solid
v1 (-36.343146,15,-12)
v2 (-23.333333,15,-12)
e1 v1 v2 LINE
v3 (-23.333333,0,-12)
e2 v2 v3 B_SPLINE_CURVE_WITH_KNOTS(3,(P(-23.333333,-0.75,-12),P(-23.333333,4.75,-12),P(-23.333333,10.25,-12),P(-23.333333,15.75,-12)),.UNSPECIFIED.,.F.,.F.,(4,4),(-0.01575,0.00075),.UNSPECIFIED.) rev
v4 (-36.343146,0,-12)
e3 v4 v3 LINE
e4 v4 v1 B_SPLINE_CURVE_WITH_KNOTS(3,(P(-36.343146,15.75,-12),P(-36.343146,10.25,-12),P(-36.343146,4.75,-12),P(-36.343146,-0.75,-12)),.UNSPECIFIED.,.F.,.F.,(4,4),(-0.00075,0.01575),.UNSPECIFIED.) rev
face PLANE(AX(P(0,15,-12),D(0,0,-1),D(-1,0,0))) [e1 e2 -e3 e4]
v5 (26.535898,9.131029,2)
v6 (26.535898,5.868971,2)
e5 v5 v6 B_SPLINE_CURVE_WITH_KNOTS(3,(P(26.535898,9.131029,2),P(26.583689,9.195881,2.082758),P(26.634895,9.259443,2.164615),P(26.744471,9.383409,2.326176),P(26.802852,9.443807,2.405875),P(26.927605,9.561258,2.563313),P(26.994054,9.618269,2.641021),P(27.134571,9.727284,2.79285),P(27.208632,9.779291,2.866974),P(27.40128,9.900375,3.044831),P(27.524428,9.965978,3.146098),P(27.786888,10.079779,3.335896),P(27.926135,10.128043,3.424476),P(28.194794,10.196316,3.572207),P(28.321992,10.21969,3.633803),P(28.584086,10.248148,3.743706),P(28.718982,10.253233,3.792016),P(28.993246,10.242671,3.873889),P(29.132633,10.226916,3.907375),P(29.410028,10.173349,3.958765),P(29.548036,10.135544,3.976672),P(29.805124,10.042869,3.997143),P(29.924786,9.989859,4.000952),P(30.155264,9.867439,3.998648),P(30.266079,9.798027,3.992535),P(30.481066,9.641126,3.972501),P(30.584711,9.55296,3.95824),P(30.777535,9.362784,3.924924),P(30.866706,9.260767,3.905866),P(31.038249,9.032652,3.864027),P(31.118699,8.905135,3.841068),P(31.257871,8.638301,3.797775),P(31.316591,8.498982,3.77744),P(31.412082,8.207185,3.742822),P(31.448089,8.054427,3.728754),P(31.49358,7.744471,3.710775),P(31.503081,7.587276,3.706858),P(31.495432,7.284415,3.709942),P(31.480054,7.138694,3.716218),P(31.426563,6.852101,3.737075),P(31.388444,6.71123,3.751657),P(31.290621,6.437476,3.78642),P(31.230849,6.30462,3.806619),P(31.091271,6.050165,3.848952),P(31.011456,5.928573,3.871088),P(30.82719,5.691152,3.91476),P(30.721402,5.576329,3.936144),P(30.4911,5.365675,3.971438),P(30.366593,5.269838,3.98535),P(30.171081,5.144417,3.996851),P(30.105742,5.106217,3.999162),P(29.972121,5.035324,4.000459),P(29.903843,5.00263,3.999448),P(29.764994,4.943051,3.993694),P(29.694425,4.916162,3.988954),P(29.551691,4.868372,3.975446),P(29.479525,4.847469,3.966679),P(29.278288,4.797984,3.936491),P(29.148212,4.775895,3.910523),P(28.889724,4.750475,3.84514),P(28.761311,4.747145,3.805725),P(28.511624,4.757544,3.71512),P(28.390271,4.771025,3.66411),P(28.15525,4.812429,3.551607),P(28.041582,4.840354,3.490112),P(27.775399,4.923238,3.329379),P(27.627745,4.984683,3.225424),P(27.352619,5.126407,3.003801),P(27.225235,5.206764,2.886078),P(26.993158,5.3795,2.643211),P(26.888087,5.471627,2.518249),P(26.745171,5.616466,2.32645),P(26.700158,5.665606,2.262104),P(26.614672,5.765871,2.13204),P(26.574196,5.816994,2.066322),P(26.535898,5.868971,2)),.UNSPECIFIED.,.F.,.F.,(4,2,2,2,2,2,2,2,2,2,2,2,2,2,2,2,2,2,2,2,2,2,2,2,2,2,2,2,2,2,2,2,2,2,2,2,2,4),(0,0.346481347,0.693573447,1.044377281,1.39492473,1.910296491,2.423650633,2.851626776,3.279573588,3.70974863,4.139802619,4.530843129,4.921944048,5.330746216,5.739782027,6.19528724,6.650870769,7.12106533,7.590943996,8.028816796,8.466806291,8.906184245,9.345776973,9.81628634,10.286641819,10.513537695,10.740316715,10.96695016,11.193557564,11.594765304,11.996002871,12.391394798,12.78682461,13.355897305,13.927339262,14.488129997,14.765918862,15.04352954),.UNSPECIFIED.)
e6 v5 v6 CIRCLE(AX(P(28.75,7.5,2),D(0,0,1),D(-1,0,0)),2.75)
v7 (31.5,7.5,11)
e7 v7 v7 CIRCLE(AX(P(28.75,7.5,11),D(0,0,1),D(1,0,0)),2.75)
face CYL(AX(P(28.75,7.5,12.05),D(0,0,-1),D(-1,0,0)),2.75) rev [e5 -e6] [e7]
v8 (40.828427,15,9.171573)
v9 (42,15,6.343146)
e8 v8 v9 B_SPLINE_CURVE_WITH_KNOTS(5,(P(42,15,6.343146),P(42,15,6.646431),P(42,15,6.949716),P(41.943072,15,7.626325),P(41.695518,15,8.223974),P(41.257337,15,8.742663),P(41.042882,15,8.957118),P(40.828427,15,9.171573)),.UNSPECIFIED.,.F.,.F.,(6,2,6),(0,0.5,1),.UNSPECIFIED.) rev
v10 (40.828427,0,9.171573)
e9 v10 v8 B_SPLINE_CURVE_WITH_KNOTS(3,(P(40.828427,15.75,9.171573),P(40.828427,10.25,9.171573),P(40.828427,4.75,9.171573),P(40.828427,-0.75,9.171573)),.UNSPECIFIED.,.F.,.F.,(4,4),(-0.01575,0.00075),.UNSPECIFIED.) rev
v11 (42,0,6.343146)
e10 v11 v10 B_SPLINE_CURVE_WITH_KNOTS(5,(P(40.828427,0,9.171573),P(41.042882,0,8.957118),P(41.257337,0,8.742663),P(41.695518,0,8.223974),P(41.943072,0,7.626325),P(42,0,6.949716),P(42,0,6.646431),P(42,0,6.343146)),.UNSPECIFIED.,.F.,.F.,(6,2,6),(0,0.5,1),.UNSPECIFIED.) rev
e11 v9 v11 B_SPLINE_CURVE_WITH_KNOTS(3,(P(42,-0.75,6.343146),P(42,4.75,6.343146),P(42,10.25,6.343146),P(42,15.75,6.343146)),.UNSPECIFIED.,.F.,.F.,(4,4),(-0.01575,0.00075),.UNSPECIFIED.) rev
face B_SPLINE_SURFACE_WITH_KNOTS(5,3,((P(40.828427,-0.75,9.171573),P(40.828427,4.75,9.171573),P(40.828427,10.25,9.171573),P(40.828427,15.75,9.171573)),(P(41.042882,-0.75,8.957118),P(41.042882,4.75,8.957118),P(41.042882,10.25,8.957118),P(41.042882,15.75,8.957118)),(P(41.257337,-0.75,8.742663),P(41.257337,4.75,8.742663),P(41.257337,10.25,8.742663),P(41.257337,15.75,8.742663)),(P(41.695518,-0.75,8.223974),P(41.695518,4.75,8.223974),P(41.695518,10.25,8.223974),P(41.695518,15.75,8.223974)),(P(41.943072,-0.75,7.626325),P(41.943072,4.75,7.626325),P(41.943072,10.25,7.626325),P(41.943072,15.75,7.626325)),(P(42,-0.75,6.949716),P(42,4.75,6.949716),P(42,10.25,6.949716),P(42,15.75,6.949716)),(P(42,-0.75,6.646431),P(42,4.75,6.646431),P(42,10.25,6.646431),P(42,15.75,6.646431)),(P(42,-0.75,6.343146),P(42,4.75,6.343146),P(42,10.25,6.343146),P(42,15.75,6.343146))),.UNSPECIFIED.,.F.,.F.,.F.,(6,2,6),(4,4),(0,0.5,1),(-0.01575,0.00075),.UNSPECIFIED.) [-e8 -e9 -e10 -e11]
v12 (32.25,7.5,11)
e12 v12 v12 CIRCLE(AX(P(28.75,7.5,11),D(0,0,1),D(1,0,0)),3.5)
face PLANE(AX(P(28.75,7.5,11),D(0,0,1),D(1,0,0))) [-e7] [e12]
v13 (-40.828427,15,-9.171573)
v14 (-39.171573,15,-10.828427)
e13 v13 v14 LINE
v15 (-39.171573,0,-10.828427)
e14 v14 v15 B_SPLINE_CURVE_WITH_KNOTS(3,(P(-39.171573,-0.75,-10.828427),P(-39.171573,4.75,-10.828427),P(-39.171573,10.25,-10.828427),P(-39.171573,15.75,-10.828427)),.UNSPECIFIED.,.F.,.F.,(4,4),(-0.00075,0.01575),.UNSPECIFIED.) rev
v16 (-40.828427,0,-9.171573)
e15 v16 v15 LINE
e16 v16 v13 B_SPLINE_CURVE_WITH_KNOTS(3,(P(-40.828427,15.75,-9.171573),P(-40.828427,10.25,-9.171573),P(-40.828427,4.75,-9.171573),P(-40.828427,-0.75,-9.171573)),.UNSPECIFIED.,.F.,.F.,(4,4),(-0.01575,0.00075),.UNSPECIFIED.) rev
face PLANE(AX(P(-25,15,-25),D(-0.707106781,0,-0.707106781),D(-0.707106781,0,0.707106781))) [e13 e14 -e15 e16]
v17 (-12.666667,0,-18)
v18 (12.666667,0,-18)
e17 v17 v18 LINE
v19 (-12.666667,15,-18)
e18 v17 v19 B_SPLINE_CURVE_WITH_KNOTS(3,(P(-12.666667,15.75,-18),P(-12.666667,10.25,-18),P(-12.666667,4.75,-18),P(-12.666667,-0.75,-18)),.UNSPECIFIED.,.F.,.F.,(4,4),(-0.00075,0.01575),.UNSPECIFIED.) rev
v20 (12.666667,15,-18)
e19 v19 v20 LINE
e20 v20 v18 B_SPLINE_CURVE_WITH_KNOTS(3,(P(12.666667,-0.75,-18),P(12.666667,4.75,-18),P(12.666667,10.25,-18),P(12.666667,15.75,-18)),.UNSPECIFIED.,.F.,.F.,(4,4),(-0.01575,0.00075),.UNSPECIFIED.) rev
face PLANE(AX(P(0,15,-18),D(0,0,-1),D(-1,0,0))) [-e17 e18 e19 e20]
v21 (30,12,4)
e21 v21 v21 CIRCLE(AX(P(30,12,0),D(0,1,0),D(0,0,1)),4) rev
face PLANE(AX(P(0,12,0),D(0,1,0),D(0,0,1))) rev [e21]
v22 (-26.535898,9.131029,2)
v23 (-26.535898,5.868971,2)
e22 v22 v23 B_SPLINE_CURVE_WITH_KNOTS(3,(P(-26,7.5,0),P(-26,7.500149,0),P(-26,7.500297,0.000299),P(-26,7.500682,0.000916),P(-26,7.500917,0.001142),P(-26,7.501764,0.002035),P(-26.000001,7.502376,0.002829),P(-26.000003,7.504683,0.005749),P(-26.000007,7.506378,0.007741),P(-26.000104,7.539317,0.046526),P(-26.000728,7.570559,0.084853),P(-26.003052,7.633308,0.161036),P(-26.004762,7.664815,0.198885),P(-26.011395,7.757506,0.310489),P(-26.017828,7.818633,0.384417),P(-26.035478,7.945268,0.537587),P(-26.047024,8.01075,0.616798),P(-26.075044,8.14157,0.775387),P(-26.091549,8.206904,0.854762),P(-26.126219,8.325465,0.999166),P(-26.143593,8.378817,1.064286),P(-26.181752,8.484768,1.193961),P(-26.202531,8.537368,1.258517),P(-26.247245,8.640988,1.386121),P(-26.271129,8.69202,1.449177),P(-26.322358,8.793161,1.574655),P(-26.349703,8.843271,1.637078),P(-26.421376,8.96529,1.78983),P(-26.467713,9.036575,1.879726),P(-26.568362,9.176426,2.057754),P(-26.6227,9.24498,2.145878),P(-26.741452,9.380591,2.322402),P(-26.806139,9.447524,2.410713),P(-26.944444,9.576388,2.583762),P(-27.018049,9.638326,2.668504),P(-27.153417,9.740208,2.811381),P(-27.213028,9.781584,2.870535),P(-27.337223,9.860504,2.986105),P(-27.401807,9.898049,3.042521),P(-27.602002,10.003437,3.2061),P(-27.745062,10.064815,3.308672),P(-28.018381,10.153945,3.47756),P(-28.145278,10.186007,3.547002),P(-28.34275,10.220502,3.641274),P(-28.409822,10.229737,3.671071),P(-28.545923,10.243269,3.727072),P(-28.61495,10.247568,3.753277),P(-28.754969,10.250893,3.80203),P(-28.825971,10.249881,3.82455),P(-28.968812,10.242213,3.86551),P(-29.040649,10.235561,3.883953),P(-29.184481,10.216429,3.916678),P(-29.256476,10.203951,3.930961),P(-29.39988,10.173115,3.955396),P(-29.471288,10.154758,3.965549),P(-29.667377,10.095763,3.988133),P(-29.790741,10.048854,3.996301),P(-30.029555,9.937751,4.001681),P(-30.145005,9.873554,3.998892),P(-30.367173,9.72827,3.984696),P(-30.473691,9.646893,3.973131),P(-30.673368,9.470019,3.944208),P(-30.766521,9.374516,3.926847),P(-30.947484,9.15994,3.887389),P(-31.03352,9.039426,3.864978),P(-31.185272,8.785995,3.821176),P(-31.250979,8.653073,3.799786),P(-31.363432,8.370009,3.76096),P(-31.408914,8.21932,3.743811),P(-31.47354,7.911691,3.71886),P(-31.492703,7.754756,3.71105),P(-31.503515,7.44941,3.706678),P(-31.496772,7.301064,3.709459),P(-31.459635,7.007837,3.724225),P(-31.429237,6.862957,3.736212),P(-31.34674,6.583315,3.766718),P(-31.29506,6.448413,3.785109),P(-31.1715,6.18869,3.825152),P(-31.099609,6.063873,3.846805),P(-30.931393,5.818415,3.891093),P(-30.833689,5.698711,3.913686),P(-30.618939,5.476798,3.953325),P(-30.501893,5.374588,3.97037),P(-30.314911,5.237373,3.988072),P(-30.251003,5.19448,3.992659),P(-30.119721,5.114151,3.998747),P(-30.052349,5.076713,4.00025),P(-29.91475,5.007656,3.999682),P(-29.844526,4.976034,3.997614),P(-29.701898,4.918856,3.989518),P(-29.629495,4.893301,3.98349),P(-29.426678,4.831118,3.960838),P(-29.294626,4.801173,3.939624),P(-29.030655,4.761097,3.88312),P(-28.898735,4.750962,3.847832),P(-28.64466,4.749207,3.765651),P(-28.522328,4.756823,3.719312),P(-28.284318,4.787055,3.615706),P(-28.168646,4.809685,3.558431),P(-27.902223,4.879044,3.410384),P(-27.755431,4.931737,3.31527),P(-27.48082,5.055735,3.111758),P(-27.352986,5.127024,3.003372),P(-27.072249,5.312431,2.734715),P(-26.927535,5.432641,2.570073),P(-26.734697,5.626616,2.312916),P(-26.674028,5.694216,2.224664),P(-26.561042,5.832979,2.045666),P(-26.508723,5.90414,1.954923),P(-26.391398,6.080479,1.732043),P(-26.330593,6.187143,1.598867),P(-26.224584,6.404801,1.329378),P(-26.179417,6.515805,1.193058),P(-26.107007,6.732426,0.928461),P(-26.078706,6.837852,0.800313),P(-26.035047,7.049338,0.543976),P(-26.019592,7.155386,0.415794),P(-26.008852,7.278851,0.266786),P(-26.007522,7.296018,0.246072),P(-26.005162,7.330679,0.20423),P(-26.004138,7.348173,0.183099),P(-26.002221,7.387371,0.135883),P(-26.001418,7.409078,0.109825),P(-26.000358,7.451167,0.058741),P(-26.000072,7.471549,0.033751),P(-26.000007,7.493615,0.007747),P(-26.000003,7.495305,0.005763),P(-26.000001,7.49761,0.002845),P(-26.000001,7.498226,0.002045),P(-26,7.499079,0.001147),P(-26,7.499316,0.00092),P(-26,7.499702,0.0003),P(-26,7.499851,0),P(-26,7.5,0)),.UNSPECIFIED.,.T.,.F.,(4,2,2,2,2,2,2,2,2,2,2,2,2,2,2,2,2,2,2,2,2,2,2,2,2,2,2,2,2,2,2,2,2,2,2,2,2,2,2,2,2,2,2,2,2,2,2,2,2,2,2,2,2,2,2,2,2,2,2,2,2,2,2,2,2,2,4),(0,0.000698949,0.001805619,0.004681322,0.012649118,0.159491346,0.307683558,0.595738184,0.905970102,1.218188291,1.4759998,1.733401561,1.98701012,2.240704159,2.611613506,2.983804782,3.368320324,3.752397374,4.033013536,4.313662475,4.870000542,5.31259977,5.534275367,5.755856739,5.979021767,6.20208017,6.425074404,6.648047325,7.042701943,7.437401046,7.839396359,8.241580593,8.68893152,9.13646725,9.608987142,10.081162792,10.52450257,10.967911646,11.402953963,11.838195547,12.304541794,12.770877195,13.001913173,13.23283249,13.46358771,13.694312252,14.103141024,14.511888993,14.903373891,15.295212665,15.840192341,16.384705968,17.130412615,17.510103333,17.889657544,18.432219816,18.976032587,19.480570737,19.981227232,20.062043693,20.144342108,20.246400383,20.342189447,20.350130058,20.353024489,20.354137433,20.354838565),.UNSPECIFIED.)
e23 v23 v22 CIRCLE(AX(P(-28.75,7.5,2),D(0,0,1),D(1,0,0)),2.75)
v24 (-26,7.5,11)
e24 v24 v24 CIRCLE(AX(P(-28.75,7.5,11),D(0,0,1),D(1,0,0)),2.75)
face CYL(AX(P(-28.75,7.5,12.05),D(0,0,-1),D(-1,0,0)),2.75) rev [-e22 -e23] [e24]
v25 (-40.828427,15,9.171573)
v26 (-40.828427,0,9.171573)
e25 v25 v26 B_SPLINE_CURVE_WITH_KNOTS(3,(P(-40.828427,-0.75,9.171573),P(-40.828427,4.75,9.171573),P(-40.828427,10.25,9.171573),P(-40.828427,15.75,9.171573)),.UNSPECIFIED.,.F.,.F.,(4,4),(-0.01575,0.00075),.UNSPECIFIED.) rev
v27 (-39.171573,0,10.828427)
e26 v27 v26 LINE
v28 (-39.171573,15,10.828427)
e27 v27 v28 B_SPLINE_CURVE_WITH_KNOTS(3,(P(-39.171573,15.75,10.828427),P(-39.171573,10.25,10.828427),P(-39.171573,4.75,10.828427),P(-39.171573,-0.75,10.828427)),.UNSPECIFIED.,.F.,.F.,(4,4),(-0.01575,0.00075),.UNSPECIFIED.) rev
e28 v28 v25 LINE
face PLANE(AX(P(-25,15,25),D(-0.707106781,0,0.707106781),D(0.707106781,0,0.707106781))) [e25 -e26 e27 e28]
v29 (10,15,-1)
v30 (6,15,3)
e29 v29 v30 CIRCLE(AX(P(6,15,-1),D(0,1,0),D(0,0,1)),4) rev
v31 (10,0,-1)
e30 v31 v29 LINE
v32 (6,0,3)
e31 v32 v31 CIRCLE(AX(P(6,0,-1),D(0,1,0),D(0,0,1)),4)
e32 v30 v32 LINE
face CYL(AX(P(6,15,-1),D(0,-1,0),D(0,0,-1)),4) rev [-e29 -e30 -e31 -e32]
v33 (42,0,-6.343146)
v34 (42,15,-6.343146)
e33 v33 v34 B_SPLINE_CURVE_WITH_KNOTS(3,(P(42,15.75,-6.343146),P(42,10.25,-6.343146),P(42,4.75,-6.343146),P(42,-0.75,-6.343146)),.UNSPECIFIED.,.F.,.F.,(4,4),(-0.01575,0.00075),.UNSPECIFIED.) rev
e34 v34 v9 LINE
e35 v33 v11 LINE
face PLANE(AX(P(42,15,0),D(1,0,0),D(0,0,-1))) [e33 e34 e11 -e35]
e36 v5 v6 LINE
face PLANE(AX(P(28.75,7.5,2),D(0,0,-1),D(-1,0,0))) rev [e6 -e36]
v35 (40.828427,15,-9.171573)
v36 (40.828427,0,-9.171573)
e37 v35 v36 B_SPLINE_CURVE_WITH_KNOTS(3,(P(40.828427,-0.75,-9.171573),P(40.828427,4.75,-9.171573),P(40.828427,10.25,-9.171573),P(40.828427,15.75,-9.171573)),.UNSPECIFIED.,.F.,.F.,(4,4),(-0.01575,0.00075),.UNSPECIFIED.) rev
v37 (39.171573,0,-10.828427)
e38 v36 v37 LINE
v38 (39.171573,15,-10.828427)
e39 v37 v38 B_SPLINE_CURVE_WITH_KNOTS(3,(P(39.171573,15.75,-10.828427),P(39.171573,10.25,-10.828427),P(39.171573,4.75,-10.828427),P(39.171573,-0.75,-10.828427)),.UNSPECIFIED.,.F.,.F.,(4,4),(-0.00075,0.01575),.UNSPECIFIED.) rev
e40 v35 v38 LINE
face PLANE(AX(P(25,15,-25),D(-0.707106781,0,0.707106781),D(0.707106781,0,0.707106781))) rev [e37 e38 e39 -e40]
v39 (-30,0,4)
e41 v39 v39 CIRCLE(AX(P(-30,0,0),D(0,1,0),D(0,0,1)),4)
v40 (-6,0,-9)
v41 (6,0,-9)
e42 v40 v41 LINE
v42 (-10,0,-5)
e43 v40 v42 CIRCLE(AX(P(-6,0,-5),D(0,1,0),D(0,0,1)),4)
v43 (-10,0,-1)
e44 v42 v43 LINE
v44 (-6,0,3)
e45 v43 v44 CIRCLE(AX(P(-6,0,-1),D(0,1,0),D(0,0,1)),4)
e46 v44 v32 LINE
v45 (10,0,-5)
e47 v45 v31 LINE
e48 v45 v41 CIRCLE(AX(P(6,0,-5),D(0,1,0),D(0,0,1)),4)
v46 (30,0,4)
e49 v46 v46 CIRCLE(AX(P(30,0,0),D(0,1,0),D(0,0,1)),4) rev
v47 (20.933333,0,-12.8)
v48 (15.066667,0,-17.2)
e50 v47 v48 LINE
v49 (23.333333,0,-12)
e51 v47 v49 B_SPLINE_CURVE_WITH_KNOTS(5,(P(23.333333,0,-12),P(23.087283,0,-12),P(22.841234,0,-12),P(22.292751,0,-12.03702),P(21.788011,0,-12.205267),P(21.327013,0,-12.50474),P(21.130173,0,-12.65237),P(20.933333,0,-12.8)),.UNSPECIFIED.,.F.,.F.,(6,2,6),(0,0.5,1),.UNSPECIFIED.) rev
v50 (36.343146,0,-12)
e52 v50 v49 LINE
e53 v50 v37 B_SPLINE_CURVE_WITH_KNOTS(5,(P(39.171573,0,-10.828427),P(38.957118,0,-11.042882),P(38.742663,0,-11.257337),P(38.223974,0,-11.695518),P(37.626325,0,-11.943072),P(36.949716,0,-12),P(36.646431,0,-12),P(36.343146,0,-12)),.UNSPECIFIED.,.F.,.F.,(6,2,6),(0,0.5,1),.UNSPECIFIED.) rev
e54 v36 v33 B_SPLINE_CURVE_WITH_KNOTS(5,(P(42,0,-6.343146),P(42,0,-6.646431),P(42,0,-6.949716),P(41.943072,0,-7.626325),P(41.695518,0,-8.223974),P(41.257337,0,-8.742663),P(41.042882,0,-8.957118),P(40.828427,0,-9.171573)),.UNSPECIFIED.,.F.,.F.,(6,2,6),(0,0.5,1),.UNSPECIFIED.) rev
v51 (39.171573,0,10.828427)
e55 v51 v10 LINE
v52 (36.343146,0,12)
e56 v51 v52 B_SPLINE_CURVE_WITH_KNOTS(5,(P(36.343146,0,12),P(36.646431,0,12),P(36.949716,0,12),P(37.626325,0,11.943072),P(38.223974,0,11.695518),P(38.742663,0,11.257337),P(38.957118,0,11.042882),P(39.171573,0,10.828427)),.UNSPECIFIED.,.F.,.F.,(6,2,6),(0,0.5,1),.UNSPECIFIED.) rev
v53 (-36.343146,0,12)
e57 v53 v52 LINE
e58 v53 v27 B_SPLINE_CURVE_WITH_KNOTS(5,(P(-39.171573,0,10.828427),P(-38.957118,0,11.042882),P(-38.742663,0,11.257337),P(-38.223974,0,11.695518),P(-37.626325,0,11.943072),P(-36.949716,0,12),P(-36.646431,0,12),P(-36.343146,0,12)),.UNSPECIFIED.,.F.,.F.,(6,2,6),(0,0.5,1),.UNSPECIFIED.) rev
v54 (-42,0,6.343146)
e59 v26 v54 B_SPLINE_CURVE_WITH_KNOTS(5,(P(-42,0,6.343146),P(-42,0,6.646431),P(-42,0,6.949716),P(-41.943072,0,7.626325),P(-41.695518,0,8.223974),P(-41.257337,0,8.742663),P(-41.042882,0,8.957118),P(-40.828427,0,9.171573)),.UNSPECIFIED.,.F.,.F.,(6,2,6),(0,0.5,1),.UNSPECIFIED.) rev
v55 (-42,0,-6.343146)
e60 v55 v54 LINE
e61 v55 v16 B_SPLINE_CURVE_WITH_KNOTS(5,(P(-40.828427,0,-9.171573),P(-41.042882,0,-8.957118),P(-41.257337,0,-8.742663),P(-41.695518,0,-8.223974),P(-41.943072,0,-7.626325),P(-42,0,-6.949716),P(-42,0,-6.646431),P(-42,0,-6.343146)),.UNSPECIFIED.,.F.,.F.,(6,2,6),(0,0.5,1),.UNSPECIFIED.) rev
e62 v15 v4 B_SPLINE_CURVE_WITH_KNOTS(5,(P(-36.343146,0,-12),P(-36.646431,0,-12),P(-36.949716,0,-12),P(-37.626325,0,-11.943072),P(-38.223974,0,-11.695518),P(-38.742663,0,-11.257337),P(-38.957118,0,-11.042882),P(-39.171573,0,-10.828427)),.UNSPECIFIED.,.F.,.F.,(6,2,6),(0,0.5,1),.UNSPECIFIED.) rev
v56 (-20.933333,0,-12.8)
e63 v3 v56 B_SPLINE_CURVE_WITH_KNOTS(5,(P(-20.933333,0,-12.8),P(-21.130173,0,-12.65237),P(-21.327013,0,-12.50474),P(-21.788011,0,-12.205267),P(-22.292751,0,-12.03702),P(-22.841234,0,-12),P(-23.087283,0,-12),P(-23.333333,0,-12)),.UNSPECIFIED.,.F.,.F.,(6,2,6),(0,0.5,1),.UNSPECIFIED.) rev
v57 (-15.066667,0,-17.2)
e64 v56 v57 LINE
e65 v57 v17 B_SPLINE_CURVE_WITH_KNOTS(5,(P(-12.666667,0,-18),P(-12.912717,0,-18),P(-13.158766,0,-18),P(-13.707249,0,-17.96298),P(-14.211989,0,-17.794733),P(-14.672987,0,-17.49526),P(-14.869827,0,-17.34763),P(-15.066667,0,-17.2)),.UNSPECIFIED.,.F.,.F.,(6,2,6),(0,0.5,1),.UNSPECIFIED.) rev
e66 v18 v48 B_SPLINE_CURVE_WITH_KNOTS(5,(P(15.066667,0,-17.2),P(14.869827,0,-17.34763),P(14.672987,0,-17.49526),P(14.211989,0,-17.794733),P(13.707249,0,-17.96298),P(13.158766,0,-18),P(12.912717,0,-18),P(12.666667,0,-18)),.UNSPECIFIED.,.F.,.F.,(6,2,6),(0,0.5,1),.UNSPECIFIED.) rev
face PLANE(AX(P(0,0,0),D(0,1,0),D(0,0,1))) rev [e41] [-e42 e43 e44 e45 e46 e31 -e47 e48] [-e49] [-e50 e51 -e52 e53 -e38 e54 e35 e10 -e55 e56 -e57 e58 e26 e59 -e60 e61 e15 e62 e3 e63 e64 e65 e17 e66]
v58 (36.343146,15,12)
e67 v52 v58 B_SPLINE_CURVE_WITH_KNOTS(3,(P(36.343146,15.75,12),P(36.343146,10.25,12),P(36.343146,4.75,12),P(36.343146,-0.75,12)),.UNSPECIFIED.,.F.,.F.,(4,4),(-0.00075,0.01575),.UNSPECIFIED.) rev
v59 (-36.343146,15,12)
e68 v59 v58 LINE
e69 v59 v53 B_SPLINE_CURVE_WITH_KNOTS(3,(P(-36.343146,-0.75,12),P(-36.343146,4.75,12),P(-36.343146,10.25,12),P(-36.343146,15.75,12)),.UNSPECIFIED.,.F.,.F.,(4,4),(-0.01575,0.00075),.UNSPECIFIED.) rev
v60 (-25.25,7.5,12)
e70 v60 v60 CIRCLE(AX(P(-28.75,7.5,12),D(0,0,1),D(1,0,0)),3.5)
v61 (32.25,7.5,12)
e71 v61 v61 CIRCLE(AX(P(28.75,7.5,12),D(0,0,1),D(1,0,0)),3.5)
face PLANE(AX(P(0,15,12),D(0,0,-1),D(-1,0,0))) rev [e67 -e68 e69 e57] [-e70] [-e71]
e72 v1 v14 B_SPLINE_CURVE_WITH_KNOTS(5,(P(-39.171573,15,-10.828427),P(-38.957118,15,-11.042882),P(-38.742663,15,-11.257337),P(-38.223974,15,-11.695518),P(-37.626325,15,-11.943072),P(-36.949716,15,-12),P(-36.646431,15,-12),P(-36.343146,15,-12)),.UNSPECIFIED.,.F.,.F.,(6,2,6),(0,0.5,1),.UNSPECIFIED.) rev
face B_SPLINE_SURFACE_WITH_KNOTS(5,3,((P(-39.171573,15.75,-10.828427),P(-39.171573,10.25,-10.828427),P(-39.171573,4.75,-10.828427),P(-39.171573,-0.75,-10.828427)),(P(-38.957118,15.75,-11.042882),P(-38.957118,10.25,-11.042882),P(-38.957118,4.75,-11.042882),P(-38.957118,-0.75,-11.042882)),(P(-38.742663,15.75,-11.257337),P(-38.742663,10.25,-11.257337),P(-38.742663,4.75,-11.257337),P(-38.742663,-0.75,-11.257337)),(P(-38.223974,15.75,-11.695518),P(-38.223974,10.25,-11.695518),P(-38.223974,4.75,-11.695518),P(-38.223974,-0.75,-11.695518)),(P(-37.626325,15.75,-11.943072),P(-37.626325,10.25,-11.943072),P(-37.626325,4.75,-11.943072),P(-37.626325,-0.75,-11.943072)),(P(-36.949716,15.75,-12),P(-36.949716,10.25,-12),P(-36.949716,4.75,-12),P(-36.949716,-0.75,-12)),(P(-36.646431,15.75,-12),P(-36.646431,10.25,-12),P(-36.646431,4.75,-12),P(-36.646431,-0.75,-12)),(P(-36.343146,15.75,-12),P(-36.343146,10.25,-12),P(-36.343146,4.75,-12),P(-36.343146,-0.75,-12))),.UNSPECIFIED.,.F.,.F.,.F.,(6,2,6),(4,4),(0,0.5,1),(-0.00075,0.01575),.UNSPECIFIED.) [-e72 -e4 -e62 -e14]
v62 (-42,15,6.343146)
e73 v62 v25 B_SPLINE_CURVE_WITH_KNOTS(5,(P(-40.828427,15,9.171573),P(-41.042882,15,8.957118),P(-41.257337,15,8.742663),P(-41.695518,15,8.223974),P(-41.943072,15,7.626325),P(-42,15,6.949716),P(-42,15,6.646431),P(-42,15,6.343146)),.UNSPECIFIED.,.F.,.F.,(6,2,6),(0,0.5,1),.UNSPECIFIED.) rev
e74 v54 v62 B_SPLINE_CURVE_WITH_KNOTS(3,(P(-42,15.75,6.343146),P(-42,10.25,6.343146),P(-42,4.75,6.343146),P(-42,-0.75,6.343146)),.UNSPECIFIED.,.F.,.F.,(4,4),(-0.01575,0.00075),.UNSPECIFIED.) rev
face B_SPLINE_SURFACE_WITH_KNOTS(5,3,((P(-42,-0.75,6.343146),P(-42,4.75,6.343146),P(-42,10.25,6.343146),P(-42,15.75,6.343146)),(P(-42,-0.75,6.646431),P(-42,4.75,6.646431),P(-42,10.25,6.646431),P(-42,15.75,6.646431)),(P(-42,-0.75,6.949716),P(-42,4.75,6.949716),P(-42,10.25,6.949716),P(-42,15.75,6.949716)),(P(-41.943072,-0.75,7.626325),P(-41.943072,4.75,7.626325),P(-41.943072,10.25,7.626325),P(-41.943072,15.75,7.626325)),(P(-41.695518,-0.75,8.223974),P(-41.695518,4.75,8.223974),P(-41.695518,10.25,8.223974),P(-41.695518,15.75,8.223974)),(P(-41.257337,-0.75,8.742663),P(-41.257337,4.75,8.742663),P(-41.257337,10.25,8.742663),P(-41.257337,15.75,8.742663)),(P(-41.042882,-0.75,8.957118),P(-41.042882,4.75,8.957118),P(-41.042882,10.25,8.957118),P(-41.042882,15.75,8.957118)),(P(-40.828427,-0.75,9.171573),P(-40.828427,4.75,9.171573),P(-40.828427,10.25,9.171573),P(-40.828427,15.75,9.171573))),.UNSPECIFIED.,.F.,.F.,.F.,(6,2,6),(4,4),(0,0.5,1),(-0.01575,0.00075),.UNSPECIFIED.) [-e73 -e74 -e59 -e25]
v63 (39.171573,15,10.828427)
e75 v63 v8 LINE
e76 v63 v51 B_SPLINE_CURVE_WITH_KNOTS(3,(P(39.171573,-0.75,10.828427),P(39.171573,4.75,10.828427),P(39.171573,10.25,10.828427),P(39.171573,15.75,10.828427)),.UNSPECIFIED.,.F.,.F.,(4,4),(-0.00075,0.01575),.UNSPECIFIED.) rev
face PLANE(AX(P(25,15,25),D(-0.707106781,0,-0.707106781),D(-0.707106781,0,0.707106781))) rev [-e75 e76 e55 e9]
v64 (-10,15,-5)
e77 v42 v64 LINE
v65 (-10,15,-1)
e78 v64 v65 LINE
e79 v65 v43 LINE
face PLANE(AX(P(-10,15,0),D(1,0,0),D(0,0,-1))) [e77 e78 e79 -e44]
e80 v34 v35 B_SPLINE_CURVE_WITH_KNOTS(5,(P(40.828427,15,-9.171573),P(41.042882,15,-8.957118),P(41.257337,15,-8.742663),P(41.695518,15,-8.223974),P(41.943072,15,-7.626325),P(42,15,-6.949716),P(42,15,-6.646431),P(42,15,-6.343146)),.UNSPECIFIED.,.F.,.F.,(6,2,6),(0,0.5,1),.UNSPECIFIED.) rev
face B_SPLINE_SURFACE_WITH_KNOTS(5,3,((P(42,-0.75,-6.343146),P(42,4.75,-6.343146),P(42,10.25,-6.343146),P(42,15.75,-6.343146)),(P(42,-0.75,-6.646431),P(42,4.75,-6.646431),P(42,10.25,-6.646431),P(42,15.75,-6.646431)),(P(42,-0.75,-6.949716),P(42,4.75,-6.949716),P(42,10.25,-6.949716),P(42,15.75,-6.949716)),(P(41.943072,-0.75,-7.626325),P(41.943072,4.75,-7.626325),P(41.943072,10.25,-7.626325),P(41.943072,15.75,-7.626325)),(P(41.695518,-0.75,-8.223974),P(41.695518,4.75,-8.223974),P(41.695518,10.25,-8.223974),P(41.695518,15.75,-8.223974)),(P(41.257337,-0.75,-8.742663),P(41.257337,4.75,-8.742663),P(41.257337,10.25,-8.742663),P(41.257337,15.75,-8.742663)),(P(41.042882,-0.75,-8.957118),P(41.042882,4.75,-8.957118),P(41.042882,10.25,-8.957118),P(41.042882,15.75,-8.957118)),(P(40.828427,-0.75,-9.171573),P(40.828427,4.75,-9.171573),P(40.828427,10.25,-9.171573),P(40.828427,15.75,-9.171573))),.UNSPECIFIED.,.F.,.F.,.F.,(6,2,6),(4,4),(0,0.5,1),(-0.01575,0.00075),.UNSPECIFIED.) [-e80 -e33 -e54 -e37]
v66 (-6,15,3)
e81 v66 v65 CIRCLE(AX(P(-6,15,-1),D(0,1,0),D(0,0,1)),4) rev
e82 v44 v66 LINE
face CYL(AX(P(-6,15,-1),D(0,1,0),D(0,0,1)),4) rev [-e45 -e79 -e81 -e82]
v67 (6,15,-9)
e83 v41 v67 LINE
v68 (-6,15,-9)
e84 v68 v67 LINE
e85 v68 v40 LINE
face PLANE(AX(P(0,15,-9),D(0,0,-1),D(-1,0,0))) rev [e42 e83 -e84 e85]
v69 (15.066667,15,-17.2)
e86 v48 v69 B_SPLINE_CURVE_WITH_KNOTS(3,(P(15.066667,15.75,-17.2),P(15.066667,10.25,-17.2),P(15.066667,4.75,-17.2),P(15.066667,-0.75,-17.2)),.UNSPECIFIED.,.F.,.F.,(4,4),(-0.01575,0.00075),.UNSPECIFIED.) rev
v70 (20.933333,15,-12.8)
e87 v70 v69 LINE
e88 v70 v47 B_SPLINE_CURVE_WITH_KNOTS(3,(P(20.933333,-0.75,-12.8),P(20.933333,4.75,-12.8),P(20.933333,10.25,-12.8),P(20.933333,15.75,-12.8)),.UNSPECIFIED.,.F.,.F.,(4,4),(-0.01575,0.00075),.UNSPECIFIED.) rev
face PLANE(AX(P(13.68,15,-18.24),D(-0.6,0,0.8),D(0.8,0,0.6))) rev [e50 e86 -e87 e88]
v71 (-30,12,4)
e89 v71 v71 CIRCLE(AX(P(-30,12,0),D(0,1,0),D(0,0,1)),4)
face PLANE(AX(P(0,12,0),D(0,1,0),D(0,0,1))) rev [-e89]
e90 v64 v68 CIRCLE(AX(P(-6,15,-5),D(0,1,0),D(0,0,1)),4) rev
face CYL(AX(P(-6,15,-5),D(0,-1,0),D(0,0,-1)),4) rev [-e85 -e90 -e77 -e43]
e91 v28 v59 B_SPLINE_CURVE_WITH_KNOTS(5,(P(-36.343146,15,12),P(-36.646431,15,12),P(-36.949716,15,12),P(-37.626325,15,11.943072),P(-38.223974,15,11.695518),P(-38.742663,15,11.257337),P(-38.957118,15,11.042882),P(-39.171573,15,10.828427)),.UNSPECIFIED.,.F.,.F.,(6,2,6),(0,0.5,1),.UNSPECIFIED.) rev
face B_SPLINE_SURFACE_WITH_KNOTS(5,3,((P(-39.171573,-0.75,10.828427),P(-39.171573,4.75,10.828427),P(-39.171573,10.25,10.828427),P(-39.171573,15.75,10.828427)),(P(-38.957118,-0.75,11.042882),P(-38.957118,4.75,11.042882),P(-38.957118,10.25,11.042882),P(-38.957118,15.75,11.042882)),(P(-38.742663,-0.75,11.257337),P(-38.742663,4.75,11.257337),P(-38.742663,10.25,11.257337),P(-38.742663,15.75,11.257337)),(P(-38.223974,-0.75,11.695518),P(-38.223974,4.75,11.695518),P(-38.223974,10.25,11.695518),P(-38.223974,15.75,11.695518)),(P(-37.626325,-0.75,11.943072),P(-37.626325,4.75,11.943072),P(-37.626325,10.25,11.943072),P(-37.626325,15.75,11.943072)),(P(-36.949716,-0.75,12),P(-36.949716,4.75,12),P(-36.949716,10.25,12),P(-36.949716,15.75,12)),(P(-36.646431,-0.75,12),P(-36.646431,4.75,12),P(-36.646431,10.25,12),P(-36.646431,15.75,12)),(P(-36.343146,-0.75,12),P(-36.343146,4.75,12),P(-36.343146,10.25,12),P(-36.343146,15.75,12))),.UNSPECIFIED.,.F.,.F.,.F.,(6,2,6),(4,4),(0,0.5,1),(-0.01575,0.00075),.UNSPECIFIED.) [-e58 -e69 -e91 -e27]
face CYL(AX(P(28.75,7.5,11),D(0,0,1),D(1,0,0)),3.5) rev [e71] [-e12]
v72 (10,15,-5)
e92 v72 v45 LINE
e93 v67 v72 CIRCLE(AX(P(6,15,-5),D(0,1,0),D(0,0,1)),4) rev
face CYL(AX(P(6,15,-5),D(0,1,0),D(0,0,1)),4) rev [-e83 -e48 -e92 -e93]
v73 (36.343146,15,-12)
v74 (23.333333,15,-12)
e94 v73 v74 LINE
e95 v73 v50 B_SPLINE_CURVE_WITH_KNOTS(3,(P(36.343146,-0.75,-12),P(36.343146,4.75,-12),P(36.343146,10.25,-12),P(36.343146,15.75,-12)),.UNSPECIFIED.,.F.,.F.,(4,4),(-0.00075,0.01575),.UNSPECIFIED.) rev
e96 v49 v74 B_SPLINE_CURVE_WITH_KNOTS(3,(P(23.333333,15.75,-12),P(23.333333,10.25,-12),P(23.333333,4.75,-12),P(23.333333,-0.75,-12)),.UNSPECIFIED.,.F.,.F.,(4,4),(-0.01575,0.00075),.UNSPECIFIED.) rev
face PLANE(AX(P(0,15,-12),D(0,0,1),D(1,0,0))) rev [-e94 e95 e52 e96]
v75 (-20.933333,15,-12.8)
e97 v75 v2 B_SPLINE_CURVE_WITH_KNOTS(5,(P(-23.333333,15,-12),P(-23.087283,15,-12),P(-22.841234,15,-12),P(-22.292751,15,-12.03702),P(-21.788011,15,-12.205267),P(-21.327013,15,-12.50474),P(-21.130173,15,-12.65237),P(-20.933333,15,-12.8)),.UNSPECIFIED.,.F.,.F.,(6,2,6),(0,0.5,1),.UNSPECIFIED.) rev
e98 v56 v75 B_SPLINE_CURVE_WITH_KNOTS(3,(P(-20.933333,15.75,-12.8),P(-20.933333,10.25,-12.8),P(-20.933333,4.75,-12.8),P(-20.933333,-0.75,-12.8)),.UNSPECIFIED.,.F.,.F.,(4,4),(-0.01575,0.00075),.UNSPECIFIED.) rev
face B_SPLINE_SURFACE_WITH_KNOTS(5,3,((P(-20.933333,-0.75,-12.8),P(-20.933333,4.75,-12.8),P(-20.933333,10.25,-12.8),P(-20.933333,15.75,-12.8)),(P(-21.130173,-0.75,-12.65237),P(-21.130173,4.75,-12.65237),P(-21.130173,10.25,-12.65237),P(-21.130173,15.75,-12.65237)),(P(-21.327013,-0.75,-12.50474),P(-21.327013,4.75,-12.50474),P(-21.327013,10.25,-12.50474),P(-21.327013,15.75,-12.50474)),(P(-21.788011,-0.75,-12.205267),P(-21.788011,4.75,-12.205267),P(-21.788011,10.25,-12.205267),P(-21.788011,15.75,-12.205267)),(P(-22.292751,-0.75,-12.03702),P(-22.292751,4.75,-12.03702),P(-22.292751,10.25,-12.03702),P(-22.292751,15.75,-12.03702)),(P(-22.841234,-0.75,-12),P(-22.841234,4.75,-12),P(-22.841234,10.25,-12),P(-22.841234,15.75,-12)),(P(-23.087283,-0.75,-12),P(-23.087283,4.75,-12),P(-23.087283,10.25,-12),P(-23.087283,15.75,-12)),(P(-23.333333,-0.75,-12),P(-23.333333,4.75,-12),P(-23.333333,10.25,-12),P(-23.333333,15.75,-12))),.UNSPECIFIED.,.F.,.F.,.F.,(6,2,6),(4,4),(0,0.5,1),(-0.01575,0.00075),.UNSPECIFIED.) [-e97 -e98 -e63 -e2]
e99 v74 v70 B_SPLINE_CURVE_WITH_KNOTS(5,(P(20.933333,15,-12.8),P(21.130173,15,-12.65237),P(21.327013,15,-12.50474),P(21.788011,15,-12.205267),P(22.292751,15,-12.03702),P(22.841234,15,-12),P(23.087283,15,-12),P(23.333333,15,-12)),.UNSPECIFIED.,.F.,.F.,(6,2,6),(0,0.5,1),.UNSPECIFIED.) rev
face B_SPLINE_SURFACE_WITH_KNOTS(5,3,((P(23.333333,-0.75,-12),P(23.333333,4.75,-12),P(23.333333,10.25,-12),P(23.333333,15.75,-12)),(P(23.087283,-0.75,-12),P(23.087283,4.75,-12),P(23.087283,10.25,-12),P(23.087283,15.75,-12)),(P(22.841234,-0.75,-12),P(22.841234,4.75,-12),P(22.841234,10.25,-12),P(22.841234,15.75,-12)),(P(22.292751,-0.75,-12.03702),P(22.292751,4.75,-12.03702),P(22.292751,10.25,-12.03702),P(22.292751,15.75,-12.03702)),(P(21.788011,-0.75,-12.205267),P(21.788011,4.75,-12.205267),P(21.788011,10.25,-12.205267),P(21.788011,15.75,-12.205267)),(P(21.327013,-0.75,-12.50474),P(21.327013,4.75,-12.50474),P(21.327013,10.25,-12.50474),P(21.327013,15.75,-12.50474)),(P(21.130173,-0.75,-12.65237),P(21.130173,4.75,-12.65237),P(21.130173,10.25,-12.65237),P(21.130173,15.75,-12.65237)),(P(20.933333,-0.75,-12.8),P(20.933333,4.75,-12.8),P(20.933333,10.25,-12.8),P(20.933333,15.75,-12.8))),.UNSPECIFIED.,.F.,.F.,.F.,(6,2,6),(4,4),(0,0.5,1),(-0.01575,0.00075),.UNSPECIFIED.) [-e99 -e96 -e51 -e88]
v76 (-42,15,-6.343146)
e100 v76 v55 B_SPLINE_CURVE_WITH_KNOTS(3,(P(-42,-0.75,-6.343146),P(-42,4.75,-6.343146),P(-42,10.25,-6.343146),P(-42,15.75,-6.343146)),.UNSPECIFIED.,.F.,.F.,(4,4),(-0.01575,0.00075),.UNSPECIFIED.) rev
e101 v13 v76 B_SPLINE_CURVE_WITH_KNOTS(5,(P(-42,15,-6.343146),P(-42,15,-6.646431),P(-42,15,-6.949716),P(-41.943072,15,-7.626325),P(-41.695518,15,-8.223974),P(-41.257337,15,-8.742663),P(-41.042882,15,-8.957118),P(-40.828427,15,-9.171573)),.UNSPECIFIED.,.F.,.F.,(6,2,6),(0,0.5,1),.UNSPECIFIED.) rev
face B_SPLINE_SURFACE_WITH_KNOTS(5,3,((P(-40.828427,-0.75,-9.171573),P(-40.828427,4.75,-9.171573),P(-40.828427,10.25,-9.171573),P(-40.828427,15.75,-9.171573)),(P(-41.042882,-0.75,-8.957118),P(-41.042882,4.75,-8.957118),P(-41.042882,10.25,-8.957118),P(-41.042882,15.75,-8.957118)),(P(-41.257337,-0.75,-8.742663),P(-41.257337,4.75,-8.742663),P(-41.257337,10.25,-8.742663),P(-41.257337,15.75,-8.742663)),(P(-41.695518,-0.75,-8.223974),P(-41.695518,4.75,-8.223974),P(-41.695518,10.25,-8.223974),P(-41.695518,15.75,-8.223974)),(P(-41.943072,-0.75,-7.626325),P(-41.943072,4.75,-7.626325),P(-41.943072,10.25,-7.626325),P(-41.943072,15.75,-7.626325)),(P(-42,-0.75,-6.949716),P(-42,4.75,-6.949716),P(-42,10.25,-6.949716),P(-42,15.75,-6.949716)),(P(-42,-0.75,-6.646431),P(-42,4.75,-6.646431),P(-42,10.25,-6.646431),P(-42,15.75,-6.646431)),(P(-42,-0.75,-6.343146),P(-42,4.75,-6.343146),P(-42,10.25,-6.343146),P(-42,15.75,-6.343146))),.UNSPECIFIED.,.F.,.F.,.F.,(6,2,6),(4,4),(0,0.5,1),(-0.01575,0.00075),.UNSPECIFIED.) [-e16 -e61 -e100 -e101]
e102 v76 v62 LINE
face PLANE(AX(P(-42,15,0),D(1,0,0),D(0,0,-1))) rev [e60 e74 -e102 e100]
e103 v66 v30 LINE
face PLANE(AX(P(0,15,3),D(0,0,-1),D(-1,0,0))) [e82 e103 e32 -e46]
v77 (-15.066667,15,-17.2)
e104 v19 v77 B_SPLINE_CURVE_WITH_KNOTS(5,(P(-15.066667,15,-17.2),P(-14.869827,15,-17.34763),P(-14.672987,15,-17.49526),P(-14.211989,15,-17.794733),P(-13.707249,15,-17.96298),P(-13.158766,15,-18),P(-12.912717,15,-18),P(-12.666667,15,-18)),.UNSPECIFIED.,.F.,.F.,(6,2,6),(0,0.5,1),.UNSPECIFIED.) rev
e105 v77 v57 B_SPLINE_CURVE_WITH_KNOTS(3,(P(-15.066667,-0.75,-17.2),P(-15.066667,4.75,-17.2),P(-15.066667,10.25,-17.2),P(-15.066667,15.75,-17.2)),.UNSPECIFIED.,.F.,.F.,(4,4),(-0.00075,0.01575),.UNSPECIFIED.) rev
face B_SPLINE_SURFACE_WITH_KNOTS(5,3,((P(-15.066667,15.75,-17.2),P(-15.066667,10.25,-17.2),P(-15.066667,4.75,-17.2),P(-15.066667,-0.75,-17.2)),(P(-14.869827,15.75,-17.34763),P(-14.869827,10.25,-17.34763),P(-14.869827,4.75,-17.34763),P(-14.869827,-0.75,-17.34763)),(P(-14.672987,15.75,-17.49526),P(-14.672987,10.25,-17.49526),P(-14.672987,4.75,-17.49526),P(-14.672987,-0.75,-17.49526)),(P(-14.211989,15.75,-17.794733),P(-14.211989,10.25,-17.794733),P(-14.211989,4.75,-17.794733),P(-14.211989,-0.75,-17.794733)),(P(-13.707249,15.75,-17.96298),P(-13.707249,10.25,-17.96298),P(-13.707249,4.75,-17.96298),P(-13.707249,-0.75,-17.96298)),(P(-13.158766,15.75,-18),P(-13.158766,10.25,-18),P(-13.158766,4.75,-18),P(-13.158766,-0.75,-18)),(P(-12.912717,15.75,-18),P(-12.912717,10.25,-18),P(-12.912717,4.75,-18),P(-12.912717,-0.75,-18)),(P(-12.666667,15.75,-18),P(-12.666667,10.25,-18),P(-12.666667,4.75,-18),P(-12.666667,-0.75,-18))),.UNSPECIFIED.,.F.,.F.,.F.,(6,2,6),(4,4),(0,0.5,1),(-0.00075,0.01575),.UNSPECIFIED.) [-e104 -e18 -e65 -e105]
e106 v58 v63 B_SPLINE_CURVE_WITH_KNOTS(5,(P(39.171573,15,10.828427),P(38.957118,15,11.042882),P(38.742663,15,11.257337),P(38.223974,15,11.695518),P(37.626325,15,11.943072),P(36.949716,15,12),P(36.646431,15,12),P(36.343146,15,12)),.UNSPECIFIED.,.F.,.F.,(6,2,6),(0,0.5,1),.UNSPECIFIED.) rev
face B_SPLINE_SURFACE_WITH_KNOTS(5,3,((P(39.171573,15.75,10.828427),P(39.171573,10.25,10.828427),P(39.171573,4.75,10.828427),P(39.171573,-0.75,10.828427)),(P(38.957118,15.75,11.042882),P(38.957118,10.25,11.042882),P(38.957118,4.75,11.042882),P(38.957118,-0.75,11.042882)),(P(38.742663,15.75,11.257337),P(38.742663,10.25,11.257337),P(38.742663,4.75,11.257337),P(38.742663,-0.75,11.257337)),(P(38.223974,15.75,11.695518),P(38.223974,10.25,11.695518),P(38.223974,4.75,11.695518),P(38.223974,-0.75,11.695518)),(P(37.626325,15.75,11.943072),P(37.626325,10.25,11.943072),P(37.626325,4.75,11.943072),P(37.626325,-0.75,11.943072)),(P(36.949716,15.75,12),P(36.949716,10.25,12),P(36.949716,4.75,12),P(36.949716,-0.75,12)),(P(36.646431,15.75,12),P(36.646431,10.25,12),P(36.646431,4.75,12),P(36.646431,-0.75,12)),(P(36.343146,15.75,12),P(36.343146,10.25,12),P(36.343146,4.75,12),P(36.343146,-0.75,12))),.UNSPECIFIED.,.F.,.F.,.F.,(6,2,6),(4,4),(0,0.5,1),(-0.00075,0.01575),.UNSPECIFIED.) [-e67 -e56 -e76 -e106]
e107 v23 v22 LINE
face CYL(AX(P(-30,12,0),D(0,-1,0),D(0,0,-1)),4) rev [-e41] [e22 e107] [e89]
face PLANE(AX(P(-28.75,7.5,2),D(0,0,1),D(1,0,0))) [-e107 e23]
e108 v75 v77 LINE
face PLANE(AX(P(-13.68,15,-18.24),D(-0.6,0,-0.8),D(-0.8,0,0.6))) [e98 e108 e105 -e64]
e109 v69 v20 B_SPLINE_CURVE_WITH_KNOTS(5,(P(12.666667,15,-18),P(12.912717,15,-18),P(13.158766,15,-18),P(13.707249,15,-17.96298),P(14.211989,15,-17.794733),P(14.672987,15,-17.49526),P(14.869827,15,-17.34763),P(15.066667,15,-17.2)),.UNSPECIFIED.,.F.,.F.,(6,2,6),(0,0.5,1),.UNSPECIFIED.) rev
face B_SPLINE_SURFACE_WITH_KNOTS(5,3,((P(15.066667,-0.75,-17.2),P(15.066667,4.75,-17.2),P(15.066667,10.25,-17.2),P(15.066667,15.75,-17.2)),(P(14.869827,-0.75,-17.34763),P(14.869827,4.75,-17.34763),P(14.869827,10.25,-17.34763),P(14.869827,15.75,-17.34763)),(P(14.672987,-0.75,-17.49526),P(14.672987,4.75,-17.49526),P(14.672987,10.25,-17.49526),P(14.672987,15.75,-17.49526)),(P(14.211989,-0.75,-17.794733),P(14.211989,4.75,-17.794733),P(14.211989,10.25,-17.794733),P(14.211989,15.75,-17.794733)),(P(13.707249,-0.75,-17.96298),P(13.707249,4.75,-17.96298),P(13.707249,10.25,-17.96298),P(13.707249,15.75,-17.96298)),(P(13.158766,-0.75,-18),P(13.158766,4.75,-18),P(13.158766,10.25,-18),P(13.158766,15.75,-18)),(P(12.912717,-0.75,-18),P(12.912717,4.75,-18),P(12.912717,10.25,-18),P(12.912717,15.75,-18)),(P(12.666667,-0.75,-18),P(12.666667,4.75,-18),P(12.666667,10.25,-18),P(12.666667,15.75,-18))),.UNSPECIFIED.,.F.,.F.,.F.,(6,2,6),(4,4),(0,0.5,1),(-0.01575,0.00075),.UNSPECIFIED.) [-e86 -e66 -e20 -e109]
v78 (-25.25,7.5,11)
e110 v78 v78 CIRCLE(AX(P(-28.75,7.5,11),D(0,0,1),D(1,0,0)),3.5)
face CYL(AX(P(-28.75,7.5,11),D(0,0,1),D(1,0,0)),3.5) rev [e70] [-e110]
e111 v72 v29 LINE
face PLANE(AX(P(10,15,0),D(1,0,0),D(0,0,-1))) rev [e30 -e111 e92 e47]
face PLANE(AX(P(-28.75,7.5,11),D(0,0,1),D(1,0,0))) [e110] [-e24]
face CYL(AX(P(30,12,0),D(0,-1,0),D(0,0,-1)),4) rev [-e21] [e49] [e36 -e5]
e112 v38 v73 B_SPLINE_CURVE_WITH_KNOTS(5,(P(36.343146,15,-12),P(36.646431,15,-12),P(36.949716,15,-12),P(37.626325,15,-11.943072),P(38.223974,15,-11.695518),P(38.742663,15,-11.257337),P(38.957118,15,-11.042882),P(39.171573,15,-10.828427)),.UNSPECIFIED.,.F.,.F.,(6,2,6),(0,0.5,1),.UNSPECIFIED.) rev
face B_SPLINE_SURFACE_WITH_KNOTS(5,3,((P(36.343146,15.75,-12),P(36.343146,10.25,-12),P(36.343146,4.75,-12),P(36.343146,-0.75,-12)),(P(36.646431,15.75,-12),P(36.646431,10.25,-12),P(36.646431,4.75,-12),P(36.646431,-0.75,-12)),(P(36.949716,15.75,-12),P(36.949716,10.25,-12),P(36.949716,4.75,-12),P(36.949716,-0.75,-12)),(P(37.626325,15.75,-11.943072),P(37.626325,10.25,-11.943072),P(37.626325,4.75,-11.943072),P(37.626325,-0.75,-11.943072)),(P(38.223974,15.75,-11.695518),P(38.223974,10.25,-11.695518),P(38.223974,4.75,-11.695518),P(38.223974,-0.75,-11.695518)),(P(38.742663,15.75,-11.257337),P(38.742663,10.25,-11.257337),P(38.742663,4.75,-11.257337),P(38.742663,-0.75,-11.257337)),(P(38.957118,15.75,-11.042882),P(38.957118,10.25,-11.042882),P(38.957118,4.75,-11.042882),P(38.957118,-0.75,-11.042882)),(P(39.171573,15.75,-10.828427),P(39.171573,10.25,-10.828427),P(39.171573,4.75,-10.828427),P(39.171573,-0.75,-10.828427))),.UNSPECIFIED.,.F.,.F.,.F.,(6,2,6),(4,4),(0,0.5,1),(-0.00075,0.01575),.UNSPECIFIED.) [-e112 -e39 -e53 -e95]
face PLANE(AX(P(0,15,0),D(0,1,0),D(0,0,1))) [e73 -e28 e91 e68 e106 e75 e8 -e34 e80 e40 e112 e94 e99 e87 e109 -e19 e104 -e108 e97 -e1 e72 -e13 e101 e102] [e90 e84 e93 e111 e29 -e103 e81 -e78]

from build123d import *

# Parameters (mm, degrees)
ESQUISSE1_W                  = 20
ESQUISSE1_H                  = 12
BOSS_EXTRU_1_DEPTH           = 15
ESQUISSE1_4_R                = 4
ENL_V_MAT_EXTRU_1_DEPTH      = 12
CONG_2_R                     = 4
ENL_V_MAT_EXTRU_2_DEPTH      = 54.749418763
ENL_V_MAT_EXTRU_2_DEPTH_BACK = 10
ESQUISSE2_R                  = 2.75
ESQUISSE4_R                  = 3.5
ENL_V_MAT_EXTRU_3_DEPTH      = 1
ESQUISSE5_R                  = 3.5
ENL_V_MAT_EXTRU_4_DEPTH      = 1


with BuildPart() as part:
    # Esquisse1 → Boss.-Extru.1 (new body)
    with BuildSketch(Plane(origin=(0, 0, 0), x_dir=(1, 0, 0), z_dir=(0, 1, 0))):
        Polygon((-38, 12), (-42, 8), (-42, -8), (-38, -12), (38, -12), (42, -8), (42, 8), (38, 12), (22, 12), (14, 18), (-14, 18), (-22, 12), align=None)
        with Locations((0, 3)):
            Rectangle(ESQUISSE1_W, ESQUISSE1_H, mode=Mode.SUBTRACT)
    extrude(amount=BOSS_EXTRU_1_DEPTH)

    # Congé1
    # a fillet whose section is not a circle: 4 mm, written as the material it adds along each edge
    with BuildSketch(Plane(origin=(22, 0, -12), x_dir=(1, 0, 0), z_dir=(0, 1, 0)), Plane(origin=(-22, 0, -12), x_dir=(0.7999999999999996, 0, -0.6000000000000003), z_dir=(0, 1, 0))) as cong_1_piece_1:
        with BuildLine():
            add(Edge.make_bspline([(1.333333333, 0), (1.087283439, 0), (0.841233545, 0), (0.292751215, 0.037020099), (-0.211988912, 0.205266808), (-0.672986836, 0.504740127), (-0.869826751, 0.652370064), (-1.066666667, 0.8)], knots=[0, 0, 0, 0, 0, 0, 0.5, 0.5, 1, 1, 1, 1, 1, 1], degree=5))
            Line((-1.066666667, 0.8), (0, 0))
            Line((0, 0), (1.333333333, 0))
        make_face()
    extrude(amount=15)
    # a fillet whose section is not a circle: 4 mm, written as the material it takes off along each edge
    with BuildSketch(Plane(origin=(42, -4.142135624, 8), x_dir=(-0.707106781186547, 0, 0.7071067811865481), z_dir=(0, 1, 0)), Plane(origin=(38, -4.142135624, 12), x_dir=(-1, 0, 0), z_dir=(0, 1, 0)), Plane(origin=(42, -4.142135624, -8), x_dir=(0, 0, 1), z_dir=(0, 1, 0)), Plane(origin=(38, -4.142135624, -12), x_dir=(0.7071067811865481, 0, 0.707106781186547), z_dir=(0, 1, 0)), Plane(origin=(-42, -4.142135624, -8), x_dir=(0.7071067811865475, 0, -0.7071067811865475), z_dir=(0, 1, 0)), Plane(origin=(-42, -4.142135624, 8), x_dir=(0, 0, -1), z_dir=(0, 1, 0)), Plane(origin=(-38, -4.142135624, 12), x_dir=(-0.7071067811865465, 0, -0.7071067811865486), z_dir=(0, 1, 0))) as cong_1_2_piece_1:
        with BuildLine():
            add(Edge.make_bspline([(1.656854249, 0), (1.35356905, 0), (1.050283851, 0), (0.373674798, -0.056927592), (-0.223974097, -0.30448187), (-0.742662833, -0.742662833), (-0.957117854, -0.957117854), (-1.171572875, -1.171572875)], knots=[0, 0, 0, 0, 0, 0, 0.5, 0.5, 1, 1, 1, 1, 1, 1], degree=5))
            Line((-1.171572875, -1.171572875), (0, 0))
            Line((0, 0), (1.656854249, 0))
        make_face()
    extrude(amount=23.284271247, mode=Mode.SUBTRACT)
    with BuildSketch(Plane(origin=(14, -3.333333333, -18), x_dir=(0.7999999999999996, 0, 0.6000000000000003), z_dir=(0, 1, 0)), Plane(origin=(-14, -3.333333333, -18), x_dir=(1, 0, 0), z_dir=(0, 1, 0))) as cong_1_2_piece_2:
        with BuildLine():
            add(Edge.make_bspline([(1.333333333, 0), (1.087283439, 0), (0.841233545, 0), (0.292751215, -0.037020099), (-0.211988912, -0.205266808), (-0.672986836, -0.504740127), (-0.869826751, -0.652370064), (-1.066666667, -0.8)], knots=[0, 0, 0, 0, 0, 0, 0.5, 0.5, 1, 1, 1, 1, 1, 1], degree=5))
            Line((-1.066666667, -0.8), (0, 0))
            Line((0, 0), (1.333333333, 0))
        make_face()
    extrude(amount=21.666666667, mode=Mode.SUBTRACT)
    with BuildSketch(Plane(origin=(-38, -4.142135624, -12), x_dir=(-0.7071067811865465, 0, 0.7071067811865486), z_dir=(0, 1, 0))) as cong_1_2_piece_3:
        with BuildLine():
            add(Edge.make_bspline([(1.656854249, 0), (1.35356905, 0), (1.050283851, 0), (0.373674798, 0.056927592), (-0.223974097, 0.30448187), (-0.742662833, 0.742662833), (-0.957117854, 0.957117854), (-1.171572875, 1.171572875)], knots=[0, 0, 0, 0, 0, 0, 0.5, 0.5, 1, 1, 1, 1, 1, 1], degree=5))
            Line((-1.171572875, 1.171572875), (0, 0))
            Line((0, 0), (1.656854249, 0))
        make_face()
    extrude(amount=23.284271247, mode=Mode.SUBTRACT)

    # Esquisse1<4> → Enlèv. mat.-Extru.1 (cut)
    with BuildSketch(Plane(origin=(0, 0, 0), x_dir=(1, 0, 0), z_dir=(0, 1, 0))):
        with Locations(Location((-30, 0, 0), (0, 0, 270))):
            Circle(ESQUISSE1_4_R)
        with Locations(Location((30, 0, 0), (0, 0, 270))):
            Circle(ESQUISSE1_4_R)
    extrude(amount=ENL_V_MAT_EXTRU_1_DEPTH, mode=Mode.SUBTRACT)

    # Congé2
    cong_2_edges = [part.edges().sort_by_distance(p)[0] for p in [
        (-10, 7.5, -9),
        (-10, 7.5, 3),
        (10, 7.5, 3),
        (10, 7.5, -9),
    ]]
    fillet(cong_2_edges, radius=CONG_2_R)

    # Esquisse2 → Enlèv. mat.-Extru.2 (cut, two sides: drawn at the far end of the back side and taken through both)
    with BuildSketch(Plane.XY.offset(12).offset(-ENL_V_MAT_EXTRU_2_DEPTH_BACK)):
        with Locations(Location((-28.75, 7.5, 0), (0, 0, 180))):
            Circle(ESQUISSE2_R)
        with Locations(Location((28.75, 7.5, 0), (0, 0, 180))):
            Circle(ESQUISSE2_R)
    extrude(amount=ENL_V_MAT_EXTRU_2_DEPTH + ENL_V_MAT_EXTRU_2_DEPTH_BACK, mode=Mode.SUBTRACT)

    # Esquisse4 → Enlèv. mat.-Extru.3 (cut)
    with BuildSketch(Plane.XY.offset(12)):
        with Locations((28.75, 7.5)):
            Circle(ESQUISSE4_R)
    extrude(amount=-ENL_V_MAT_EXTRU_3_DEPTH, mode=Mode.SUBTRACT)

    # Esquisse5 → Enlèv. mat.-Extru.4 (cut)
    with BuildSketch(Plane.XY.offset(12)):
        with Locations((-28.75, 7.5)):
            Circle(ESQUISSE5_R)
    extrude(amount=-ENL_V_MAT_EXTRU_4_DEPTH, mode=Mode.SUBTRACT)


solid = part.part
